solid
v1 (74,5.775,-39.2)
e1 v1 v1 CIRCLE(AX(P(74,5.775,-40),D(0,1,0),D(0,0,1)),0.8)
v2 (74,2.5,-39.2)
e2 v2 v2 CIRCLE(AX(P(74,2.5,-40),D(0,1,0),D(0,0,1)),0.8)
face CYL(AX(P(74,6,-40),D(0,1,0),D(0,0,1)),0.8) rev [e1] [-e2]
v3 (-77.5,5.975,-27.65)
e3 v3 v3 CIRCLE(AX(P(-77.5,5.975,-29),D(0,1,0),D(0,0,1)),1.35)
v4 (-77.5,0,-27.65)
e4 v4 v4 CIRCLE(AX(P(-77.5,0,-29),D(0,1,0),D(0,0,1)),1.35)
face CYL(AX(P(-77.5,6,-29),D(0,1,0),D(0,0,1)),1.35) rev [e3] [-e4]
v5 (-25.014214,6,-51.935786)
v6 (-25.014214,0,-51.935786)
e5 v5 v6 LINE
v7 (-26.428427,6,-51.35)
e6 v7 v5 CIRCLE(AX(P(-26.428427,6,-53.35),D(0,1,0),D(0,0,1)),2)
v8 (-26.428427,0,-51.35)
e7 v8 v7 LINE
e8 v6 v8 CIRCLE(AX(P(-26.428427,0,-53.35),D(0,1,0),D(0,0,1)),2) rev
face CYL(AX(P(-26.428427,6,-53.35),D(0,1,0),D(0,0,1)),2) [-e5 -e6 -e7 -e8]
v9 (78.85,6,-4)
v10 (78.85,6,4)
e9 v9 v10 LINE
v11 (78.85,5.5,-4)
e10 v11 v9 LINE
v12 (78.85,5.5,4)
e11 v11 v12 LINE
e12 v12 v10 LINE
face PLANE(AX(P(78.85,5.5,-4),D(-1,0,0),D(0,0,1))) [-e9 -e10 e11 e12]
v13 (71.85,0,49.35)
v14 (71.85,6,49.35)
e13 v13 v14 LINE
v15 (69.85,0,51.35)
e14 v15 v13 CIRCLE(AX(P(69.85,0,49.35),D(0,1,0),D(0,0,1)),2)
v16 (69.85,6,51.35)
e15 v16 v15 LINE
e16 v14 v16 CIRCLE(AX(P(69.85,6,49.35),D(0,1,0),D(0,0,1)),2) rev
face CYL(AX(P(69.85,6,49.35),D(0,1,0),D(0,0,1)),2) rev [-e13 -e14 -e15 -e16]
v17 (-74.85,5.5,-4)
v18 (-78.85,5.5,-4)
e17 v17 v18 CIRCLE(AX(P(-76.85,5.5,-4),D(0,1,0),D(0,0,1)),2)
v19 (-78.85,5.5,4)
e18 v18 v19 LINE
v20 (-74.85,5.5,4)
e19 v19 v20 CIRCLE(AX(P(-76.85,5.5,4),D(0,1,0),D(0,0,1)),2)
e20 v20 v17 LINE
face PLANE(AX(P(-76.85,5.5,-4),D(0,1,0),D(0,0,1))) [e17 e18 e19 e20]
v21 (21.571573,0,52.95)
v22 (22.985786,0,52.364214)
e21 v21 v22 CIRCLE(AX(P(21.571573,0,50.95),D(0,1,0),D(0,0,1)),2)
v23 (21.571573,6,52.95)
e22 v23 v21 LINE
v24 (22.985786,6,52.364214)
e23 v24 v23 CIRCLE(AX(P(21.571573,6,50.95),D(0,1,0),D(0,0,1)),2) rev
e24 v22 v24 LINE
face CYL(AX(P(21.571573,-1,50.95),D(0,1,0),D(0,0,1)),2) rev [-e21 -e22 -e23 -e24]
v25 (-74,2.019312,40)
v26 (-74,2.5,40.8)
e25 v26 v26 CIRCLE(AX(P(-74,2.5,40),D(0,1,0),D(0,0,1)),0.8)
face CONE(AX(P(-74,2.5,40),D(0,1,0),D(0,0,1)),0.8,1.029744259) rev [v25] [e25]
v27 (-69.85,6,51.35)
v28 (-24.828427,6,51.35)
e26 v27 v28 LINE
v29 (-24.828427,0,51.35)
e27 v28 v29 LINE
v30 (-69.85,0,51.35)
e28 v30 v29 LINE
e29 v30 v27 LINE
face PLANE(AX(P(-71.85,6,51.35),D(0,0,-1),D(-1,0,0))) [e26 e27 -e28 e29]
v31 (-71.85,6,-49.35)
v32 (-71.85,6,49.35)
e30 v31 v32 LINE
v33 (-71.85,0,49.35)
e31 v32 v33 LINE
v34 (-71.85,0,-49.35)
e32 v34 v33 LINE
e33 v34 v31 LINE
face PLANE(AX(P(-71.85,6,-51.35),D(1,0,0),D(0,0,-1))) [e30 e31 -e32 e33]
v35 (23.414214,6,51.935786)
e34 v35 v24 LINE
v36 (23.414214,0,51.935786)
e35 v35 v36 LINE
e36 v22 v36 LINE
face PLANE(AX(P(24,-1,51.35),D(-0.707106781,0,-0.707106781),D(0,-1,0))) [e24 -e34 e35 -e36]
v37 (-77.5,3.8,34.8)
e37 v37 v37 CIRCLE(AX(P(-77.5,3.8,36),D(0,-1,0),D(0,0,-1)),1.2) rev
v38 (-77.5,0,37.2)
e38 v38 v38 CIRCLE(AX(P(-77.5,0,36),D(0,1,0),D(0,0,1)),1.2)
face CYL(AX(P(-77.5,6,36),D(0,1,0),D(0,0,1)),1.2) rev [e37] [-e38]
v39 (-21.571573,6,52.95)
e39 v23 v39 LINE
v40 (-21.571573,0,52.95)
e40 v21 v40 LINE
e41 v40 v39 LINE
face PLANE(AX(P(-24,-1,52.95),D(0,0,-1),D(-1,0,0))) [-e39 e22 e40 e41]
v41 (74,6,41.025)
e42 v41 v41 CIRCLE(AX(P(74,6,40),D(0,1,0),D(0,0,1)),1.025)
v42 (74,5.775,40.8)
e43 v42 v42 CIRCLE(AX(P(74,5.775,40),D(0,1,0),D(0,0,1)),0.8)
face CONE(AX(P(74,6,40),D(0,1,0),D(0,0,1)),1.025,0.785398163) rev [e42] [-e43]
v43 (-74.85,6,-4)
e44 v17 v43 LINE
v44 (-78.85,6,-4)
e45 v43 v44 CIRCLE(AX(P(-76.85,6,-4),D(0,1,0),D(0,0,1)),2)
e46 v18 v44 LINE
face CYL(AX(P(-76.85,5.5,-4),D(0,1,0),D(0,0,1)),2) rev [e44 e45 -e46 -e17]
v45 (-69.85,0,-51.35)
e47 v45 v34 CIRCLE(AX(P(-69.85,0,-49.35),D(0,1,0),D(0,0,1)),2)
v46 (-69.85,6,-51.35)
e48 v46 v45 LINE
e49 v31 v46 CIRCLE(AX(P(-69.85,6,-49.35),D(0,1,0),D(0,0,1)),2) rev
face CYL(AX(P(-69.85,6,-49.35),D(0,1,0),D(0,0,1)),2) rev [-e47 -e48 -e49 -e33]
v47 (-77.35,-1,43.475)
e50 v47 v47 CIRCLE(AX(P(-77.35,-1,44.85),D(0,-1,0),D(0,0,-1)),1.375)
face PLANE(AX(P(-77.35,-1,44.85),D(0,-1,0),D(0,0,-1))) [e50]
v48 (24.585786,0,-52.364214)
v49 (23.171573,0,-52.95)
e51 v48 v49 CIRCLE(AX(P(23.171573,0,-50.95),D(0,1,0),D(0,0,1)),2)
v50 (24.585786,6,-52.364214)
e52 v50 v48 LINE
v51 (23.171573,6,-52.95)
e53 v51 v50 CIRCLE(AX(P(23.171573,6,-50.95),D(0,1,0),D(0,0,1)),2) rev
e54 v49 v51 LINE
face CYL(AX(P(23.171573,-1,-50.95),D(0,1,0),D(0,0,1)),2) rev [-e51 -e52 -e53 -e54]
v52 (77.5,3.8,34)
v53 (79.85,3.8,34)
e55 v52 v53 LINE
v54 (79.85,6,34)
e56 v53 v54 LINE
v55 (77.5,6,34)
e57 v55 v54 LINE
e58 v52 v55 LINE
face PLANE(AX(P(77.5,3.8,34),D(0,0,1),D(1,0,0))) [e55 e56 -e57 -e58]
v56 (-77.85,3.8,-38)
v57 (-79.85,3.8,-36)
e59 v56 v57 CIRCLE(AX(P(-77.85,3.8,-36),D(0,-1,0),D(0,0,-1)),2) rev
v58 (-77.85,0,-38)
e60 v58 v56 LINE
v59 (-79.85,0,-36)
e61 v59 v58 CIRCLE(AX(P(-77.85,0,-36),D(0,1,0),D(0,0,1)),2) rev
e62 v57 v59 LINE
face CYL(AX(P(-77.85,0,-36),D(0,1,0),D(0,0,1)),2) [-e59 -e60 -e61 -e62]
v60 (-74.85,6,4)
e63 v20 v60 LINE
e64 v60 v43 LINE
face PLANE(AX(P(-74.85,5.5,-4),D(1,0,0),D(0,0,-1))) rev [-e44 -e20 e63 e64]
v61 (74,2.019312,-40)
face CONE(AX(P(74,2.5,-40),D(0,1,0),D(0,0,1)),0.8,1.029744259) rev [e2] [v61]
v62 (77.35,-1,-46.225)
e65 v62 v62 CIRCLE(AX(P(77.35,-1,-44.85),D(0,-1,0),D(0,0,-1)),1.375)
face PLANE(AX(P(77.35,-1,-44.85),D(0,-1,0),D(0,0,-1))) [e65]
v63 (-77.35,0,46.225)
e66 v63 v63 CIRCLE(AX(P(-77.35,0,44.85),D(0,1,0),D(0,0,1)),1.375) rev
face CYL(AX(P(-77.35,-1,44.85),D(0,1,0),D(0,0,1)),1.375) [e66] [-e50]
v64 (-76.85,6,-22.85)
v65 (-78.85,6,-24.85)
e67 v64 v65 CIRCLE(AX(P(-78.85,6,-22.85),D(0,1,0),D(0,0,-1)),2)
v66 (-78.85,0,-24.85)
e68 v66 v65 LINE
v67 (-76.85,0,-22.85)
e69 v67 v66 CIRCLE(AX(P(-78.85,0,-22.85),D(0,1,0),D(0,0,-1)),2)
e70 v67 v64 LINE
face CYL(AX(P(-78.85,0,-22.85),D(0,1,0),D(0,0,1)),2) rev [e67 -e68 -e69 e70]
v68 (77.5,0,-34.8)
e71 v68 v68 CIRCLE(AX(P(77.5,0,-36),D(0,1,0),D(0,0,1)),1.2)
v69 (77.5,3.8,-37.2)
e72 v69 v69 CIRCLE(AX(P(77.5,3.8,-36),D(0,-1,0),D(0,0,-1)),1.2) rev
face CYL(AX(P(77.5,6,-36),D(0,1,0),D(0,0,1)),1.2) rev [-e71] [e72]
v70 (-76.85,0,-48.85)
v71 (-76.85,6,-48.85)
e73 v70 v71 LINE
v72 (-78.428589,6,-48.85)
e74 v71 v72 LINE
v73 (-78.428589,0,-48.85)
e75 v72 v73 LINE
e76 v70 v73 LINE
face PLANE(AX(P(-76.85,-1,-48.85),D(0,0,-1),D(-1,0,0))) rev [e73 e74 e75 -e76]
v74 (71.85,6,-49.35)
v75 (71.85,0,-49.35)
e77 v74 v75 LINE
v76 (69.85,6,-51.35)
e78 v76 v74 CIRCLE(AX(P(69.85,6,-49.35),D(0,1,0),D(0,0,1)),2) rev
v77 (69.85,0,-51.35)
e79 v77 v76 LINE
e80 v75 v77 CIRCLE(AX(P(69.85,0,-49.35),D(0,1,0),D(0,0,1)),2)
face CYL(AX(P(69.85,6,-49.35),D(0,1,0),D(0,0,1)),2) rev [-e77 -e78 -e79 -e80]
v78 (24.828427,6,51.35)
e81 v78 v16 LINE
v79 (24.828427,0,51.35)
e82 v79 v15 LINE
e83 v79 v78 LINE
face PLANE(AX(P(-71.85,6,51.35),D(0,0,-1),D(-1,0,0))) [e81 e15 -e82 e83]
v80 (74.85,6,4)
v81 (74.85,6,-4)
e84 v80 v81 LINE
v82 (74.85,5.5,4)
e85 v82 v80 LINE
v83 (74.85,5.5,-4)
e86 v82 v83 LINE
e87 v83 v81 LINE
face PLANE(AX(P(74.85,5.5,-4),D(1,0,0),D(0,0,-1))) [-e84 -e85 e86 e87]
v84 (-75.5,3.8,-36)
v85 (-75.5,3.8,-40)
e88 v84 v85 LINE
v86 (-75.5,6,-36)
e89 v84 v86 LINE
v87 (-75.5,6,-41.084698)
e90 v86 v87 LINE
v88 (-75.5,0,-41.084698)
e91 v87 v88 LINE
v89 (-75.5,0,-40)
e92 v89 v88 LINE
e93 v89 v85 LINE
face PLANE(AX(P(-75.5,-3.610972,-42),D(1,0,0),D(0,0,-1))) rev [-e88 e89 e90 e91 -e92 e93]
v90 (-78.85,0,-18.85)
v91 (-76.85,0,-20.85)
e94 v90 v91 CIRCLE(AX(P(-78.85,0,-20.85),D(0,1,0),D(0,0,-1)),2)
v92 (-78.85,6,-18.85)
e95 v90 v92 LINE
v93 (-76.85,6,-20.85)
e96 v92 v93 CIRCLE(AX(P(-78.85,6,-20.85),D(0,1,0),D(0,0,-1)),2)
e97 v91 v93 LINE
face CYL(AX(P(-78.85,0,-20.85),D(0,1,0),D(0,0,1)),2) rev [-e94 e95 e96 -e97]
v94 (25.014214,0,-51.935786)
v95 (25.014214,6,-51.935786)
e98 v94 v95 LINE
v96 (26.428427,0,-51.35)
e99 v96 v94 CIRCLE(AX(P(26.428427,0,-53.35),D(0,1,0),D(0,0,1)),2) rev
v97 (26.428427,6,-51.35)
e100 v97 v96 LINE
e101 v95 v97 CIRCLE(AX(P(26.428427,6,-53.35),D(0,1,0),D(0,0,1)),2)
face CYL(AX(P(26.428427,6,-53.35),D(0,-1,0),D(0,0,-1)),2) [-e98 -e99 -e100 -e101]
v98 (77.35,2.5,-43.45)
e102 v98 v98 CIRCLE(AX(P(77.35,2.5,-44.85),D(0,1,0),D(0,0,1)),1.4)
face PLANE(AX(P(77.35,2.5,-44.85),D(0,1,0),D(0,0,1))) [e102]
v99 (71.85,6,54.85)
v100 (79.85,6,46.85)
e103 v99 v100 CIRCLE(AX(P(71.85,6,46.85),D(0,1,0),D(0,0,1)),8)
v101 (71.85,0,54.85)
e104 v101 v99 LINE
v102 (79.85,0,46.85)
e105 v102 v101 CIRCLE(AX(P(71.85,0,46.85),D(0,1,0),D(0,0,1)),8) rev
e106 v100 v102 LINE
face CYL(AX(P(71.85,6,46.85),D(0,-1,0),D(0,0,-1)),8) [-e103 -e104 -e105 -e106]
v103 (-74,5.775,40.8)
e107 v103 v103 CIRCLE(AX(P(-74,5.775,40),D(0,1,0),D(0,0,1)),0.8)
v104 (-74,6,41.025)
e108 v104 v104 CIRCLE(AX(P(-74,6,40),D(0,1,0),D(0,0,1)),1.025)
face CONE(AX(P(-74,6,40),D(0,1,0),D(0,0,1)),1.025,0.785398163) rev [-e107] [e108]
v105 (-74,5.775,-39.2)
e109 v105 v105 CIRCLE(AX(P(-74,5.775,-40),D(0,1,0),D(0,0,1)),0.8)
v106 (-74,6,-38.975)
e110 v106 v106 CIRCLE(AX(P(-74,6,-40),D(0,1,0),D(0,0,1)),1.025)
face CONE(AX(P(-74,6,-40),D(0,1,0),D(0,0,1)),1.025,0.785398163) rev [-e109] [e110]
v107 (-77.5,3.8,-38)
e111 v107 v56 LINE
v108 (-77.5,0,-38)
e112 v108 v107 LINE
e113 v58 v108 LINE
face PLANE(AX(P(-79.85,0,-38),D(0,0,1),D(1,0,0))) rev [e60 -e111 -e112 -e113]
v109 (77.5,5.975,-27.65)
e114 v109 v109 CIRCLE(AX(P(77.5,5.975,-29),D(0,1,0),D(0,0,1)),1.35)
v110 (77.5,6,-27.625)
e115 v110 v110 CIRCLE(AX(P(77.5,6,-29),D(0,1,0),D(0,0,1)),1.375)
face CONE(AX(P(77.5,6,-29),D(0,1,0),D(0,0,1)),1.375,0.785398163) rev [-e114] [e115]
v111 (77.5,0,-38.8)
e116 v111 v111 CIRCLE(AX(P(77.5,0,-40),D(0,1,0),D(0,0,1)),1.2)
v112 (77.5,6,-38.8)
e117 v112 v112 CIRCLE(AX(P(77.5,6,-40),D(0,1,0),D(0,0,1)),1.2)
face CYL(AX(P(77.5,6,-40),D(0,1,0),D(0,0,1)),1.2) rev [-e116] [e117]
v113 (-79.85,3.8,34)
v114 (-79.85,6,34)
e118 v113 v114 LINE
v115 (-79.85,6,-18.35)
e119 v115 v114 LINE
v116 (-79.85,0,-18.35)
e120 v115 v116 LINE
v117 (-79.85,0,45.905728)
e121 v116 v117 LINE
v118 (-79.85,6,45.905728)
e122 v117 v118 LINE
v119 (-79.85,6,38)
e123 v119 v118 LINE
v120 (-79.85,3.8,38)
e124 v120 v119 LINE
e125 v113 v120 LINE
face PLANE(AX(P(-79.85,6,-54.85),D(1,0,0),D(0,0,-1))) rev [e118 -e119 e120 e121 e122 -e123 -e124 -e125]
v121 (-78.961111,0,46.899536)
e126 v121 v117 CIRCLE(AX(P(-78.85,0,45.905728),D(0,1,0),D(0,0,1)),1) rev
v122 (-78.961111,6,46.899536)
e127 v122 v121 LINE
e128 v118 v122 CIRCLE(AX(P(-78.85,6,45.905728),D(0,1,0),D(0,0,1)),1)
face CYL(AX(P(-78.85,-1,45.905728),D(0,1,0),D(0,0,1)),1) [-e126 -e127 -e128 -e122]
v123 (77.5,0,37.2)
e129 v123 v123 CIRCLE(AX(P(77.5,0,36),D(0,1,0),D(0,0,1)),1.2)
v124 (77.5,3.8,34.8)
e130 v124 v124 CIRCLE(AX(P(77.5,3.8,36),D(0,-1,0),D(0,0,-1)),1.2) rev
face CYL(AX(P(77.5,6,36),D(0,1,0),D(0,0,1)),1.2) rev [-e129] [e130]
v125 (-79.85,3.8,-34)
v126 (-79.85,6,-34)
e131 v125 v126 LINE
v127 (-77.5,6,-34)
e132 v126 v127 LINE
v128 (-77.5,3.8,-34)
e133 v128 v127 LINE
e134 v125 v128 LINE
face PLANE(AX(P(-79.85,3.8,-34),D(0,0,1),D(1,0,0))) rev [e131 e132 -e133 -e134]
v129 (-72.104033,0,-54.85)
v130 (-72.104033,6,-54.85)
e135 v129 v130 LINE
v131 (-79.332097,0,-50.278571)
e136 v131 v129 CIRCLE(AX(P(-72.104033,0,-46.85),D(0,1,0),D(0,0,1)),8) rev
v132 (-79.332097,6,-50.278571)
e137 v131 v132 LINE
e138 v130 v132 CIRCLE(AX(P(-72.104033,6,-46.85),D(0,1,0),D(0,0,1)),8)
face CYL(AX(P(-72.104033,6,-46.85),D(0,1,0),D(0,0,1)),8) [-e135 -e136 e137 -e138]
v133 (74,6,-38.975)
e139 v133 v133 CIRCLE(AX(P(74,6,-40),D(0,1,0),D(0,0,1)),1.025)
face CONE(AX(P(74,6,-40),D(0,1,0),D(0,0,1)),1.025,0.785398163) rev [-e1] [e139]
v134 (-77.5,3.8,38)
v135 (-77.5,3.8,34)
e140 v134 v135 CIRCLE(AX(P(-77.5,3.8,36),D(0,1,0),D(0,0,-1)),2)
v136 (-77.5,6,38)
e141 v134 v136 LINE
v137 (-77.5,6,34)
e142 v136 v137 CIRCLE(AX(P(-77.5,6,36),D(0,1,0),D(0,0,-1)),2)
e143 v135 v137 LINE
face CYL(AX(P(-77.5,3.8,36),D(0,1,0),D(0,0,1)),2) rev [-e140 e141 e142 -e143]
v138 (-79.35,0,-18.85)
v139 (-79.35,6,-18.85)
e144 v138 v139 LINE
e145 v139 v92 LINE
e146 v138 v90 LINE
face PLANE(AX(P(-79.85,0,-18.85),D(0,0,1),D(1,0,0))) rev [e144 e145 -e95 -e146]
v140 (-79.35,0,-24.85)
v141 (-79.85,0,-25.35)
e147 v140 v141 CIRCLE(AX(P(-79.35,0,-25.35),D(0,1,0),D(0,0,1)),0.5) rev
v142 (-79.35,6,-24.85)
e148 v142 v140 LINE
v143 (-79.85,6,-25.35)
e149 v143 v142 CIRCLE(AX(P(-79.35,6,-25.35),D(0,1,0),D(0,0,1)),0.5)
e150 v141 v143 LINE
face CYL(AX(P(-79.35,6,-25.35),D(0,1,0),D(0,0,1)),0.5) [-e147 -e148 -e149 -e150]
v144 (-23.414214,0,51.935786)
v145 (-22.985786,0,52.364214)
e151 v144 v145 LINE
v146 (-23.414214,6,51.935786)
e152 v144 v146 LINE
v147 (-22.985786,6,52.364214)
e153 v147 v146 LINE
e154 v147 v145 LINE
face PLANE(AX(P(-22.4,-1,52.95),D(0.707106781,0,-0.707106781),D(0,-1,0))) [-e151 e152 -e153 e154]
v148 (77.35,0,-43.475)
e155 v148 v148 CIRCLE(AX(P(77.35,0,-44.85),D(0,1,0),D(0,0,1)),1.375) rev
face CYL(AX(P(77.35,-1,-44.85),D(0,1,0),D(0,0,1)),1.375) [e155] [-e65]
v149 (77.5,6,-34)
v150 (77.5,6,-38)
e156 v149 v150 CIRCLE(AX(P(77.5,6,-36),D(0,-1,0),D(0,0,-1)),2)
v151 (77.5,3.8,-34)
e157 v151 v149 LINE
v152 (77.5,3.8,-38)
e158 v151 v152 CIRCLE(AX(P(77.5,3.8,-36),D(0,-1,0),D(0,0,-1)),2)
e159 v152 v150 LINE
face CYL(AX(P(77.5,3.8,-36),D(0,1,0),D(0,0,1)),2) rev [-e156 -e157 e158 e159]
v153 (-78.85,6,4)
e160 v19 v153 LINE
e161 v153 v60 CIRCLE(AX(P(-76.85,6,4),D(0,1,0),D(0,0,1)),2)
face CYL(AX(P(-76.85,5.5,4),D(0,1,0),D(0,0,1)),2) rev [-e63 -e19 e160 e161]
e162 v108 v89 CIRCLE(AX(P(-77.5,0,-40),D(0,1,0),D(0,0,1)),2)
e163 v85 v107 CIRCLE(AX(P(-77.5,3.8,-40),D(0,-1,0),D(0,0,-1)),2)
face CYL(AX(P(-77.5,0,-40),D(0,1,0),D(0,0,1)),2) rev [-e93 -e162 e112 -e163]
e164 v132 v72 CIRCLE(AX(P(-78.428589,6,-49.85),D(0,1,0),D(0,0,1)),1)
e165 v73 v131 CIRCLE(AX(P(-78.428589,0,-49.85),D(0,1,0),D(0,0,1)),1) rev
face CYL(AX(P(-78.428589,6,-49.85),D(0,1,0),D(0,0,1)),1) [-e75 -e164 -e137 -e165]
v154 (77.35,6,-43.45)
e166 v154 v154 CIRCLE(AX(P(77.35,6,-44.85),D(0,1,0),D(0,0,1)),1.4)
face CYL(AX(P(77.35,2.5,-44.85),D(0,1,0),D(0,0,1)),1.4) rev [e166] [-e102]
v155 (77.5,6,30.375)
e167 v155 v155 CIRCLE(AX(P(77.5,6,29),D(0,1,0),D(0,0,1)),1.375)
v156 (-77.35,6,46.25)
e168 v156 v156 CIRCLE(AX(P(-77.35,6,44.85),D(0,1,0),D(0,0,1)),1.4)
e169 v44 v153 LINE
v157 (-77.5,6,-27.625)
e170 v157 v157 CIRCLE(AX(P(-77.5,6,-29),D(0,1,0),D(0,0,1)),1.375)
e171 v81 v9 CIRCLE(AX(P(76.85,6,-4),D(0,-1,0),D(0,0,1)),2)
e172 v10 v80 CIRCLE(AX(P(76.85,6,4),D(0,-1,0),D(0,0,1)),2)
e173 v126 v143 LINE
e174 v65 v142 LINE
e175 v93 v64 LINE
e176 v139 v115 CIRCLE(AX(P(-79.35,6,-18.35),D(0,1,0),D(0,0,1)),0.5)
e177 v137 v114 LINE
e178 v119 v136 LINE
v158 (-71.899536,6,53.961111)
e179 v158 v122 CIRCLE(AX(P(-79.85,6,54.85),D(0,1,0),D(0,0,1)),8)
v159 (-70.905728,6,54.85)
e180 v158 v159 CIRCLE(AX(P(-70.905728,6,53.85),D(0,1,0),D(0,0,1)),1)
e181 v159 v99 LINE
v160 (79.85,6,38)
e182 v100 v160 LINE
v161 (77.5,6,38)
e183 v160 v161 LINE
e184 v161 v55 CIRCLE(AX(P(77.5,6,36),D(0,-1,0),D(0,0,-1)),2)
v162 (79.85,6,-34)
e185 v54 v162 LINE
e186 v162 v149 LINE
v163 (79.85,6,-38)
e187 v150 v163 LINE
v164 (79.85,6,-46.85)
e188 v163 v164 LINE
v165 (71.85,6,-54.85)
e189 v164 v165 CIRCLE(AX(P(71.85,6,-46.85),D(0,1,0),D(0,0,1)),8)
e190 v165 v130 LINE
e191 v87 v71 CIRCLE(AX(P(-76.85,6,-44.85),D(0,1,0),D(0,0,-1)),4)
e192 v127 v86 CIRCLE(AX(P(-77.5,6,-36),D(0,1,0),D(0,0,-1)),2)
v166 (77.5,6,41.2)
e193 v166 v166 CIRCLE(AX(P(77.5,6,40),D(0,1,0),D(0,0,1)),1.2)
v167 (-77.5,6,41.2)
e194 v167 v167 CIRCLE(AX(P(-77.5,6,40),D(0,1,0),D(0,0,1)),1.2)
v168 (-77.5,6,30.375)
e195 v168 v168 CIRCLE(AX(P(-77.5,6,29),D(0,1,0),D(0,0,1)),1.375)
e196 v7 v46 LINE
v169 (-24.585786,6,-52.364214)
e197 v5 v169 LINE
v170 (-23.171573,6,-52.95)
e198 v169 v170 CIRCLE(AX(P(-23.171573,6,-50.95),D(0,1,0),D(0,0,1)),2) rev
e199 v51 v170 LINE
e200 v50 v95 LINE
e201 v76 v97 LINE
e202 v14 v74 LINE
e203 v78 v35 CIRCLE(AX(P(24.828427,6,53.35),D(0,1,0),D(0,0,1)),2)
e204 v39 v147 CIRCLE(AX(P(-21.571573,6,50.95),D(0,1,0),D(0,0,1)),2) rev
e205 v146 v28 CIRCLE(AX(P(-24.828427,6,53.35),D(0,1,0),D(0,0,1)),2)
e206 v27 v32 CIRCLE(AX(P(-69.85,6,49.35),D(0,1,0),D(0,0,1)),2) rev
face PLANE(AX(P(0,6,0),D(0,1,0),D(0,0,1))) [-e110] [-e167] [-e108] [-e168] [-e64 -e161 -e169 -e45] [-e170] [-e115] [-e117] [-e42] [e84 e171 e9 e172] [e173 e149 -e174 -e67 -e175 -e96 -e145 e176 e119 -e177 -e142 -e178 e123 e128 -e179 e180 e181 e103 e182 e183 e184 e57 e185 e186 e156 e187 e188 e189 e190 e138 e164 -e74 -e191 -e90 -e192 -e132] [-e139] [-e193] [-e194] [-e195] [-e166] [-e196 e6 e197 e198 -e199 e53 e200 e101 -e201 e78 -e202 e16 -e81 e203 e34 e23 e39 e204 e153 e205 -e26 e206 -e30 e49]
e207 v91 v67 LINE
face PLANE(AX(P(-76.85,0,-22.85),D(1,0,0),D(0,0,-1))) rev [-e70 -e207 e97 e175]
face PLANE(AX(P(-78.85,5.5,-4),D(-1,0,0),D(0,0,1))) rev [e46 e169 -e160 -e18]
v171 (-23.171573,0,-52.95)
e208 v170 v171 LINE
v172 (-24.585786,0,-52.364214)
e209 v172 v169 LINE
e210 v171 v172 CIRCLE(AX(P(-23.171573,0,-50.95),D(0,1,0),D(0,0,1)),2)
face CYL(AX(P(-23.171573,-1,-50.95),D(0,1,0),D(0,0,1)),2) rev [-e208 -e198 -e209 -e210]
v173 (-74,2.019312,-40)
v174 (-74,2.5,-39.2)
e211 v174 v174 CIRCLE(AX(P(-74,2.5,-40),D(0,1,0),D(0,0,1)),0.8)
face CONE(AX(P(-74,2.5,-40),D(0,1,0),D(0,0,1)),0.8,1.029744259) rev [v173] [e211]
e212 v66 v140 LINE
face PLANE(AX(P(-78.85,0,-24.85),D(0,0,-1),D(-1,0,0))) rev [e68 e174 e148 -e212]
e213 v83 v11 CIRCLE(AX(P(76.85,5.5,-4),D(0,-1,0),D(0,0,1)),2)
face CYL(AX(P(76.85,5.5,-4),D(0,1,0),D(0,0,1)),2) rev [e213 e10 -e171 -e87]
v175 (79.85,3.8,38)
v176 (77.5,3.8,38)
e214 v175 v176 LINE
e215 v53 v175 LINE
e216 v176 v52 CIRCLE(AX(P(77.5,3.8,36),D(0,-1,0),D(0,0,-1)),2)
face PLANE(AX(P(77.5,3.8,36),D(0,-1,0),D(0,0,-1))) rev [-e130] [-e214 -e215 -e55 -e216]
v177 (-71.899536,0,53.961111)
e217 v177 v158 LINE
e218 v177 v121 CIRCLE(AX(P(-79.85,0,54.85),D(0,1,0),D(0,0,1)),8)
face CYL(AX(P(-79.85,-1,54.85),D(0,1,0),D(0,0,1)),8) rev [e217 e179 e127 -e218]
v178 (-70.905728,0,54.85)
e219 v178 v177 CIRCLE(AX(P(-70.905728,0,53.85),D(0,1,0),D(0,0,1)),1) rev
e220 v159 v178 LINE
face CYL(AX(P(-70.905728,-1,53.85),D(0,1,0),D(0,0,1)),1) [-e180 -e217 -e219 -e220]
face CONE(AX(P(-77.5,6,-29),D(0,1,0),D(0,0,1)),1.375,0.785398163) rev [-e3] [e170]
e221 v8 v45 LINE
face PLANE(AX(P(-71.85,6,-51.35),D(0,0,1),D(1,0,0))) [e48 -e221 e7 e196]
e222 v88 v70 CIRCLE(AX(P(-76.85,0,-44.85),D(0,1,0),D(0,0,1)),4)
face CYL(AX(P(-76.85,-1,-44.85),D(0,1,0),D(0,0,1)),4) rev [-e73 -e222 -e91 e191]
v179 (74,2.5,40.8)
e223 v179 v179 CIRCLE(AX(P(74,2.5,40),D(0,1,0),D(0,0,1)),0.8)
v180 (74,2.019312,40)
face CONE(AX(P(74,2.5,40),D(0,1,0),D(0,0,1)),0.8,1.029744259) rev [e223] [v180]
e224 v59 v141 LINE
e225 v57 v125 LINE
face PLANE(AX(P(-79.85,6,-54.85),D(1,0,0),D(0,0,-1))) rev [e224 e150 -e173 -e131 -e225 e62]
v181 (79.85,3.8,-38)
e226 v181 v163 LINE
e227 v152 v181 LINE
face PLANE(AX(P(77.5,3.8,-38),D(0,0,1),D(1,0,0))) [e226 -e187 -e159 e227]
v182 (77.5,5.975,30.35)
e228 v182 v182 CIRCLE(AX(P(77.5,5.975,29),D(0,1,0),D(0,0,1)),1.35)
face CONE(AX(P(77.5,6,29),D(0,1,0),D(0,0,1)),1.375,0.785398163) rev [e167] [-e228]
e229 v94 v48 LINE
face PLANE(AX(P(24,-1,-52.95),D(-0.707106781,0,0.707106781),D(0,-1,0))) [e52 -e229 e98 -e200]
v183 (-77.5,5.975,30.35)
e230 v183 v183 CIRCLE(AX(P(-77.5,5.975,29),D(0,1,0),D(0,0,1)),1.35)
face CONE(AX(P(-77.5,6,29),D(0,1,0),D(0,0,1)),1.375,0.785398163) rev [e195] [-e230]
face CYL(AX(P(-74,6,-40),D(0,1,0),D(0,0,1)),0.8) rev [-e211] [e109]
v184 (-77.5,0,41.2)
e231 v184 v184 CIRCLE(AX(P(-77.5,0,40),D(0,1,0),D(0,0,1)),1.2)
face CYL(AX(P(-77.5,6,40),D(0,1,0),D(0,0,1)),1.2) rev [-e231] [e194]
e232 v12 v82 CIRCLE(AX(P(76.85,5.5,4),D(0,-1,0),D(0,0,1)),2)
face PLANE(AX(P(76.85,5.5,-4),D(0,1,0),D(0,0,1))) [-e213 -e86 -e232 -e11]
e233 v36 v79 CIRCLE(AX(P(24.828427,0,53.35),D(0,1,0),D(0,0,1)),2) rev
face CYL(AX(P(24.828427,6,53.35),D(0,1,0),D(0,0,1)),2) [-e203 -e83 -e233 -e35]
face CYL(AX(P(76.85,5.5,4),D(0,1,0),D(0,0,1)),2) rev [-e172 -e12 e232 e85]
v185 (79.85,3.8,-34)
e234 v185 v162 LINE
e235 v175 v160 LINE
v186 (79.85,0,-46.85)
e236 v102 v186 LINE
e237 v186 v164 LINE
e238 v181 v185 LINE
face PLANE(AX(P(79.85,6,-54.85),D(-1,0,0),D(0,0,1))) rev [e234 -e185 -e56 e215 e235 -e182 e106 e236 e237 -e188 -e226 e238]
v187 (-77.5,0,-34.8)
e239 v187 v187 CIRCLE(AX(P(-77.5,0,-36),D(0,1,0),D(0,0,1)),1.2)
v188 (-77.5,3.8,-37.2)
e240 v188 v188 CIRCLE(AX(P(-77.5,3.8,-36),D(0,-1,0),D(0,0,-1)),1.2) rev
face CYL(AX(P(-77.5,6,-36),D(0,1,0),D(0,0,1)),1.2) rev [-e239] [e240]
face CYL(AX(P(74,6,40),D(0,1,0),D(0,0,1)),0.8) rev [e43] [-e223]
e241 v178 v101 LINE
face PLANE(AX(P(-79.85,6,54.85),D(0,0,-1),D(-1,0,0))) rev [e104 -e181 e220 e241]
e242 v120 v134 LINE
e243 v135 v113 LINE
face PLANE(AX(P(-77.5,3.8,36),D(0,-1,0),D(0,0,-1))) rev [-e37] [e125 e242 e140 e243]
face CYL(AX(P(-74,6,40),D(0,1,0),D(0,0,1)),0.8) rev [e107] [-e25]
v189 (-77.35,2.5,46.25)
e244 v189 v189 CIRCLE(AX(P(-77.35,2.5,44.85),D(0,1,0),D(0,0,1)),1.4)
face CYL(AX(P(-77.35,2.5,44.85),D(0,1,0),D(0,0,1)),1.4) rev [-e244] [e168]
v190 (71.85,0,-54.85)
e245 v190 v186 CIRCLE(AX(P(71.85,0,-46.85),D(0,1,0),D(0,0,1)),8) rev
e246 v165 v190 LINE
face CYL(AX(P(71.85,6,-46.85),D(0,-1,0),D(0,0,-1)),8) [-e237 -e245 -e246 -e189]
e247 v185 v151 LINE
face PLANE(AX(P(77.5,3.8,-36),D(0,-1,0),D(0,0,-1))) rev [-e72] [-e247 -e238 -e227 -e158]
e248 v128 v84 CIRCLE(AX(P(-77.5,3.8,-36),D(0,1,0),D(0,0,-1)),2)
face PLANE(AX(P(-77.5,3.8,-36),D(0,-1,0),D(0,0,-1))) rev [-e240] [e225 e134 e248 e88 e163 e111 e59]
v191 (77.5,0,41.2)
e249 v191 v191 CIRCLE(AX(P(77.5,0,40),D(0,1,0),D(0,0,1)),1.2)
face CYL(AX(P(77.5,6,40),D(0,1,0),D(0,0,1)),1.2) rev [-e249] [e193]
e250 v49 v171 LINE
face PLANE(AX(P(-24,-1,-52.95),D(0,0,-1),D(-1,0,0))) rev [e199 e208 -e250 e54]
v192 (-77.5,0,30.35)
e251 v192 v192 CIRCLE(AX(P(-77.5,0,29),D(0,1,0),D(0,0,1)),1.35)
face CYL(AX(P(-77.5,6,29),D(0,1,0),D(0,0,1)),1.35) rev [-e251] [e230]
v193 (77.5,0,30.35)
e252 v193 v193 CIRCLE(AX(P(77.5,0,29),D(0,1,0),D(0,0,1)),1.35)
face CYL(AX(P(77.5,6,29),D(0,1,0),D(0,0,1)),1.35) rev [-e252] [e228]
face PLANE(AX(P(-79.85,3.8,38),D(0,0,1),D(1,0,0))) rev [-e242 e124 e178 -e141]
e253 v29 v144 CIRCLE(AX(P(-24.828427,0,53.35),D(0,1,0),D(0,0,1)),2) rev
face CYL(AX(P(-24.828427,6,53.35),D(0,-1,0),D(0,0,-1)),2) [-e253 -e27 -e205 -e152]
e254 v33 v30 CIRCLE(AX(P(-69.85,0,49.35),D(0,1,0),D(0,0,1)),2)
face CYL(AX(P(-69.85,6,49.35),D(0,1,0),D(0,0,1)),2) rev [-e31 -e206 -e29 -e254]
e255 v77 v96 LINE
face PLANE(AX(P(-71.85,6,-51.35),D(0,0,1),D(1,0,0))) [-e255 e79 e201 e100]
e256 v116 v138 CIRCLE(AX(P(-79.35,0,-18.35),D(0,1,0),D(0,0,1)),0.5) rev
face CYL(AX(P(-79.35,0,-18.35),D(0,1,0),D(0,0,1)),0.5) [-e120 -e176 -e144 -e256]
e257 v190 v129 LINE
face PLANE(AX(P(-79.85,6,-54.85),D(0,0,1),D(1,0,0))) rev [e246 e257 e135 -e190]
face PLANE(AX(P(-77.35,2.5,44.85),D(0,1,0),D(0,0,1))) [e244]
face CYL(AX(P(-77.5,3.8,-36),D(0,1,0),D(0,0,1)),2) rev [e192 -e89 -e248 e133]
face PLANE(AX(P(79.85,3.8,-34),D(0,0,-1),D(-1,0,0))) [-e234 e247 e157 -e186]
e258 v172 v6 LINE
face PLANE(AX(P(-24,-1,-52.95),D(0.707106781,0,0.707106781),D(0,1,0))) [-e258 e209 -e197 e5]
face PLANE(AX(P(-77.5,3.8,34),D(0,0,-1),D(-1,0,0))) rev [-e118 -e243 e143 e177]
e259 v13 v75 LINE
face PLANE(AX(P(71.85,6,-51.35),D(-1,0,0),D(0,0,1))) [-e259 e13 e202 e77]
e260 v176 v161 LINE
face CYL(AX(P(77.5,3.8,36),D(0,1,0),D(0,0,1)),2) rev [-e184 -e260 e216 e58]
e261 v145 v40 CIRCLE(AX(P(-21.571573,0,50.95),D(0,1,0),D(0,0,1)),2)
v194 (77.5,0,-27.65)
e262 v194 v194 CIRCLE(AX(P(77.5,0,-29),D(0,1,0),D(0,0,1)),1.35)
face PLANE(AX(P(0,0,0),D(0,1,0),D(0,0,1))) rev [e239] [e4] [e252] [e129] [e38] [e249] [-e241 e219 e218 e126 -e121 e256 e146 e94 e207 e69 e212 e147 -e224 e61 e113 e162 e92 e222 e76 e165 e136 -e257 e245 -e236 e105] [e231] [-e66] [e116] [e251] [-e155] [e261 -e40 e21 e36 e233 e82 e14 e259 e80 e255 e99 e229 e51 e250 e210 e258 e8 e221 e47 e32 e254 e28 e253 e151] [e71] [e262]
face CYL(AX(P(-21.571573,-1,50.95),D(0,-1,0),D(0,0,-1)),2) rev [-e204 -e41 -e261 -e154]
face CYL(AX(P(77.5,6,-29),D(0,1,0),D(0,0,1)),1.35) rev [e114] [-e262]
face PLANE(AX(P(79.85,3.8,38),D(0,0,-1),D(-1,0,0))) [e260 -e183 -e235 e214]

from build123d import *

# Parameters (mm, degrees)
SKETCH1_W                            = 159.7
SKETCH1_H                            = 109.7
SKETCH1_W_2                          = 143.7
SKETCH1_H_2                          = 102.7
BOSS_EXTRUDE1_DEPTH                  = 6
F_2_4_2_4_DIAMETER_HOLE1_D           = 2.4
CUT_EXTRUDE10_DEPTH                  = 2.2
LPATTERN1_COUNT                      = 2
LPATTERN1_PITCH                      = 72
MIRROR2_COPY_1_DEPTH                 = 2.2
M2X0_4_TAPPED_HOLE1_D                = 1.6
M2X0_4_TAPPED_HOLE1_DEPTH            = 3.5
M2X0_4_TAPPED_HOLE1_CSINK_D          = 2.05
M2X0_4_TAPPED_HOLE1_CSINK_ANGLE      = 90
M2X0_4_TAPPED_HOLE1_TIP              = 0.480688495
CUT_EXTRUDE3_DEPTH                   = 0.5
SKETCH11_W                           = 4.35
SKETCH11_H                           = 6
CUT_EXTRUDE4_DEPTH                   = 2.2
CUT_EXTRUDE11_DEPTH                  = 97.948362544
CUT_EXTRUDE11_DEPTH_BACK             = 97.948362544
F_2_4_2_4_DIAMETER_HOLE2_D           = 2.4
F_2_7_2_7_DIAMETER_HOLE1_D           = 2.7
F_2_7_2_7_DIAMETER_HOLE1_CSINK_D     = 2.75
F_2_7_2_7_DIAMETER_HOLE1_CSINK_ANGLE = 90
CUT_EXTRUDE6_DEPTH                   = 98.059492065
SKETCH19_R                           = 1.4
CUT_EXTRUDE7_DEPTH                   = 3.5
SKETCH32_R                           = 1.375
BOSS_EXTRUDE2_DEPTH                  = 1
CUT_EXTRUDE8_DEPTH                   = 98.126438213
SKETCH8_R                            = 8
CUT_EXTRUDE9_DEPTH                   = 98.126438213
FILLET1_R                            = 2
FILLET2_R                            = 8
FILLET3_R                            = 1
FILLET4_R                            = 2
FILLET5_R                            = 0.5
SKETCH31_W                           = 48
SKETCH31_H                           = 1.6
CUT_EXTRUDE12_DEPTH                  = 98.126438213
CHAMFER1_START                       = -1
CHAMFER1_DEPTH                       = 8
CHAMFER1_2_DEPTH                     = 6
FILLET6_R                            = 2


with BuildPart() as part:
    # Sketch1 → Boss-Extrude1 (new body)
    with BuildSketch(Plane(origin=(0, 0, 0), x_dir=(1, 0, 0), z_dir=(0, 1, 0))):
        Rectangle(SKETCH1_W, SKETCH1_H)
        Rectangle(SKETCH1_W_2, SKETCH1_H_2, mode=Mode.SUBTRACT)
    extrude(amount=BOSS_EXTRUDE1_DEPTH)

    # Ø2.4 (2.4) Diameter Hole1 (through all)
    with Locations(Plane(origin=(0, 6, 0), x_dir=(1, 0, 0), z_dir=(0, 1, 0))):
        with Locations((-77.5, 36), (77.5, 36), (-77.5, -36), (77.5, -36)):
            Hole(F_2_4_2_4_DIAMETER_HOLE1_D / 2)

    # Sketch29 → Cut-Extrude10 (cut)
    with BuildSketch(Plane(origin=(0, 6, 0), x_dir=(1, 0, 0), z_dir=(0, 1, 0))):
        with BuildLine():
            Line((-77.5, 38), (-79.85, 38))
            Line((-79.85, 38), (-79.85, 34))
            Line((-79.85, 34), (-77.5, 34))
            ThreePointArc((-77.5, 34), (-75.5, 36), (-77.5, 38))
        make_face()
    cut_extrude10 = extrude(amount=-CUT_EXTRUDE10_DEPTH, mode=Mode.SUBTRACT)

    # LPattern1: Cut-Extrude10 ×2
    with Locations(*[(0, 0, i * LPATTERN1_PITCH) for i in range(1, LPATTERN1_COUNT)]):
        add(cut_extrude10, mode=Mode.SUBTRACT)

    # Mirror2: Cut-Extrude10 across plane
    add(cut_extrude10.mirror(Plane(origin=(0, 0, 0), x_dir=(0, 0, 1), z_dir=(1, 0, 0))), mode=Mode.SUBTRACT)

    # Mirror2 copy 1 sketch → Mirror2 copy 1 (cut)
    with BuildSketch(Plane(origin=(0, 6, 72), x_dir=(-1, 0, 0), z_dir=(0, 1, 0))):
        with BuildLine():
            Line((-77.5, -38), (-79.85, -38))
            Line((-79.85, -38), (-79.85, -34))
            Line((-79.85, -34), (-77.5, -34))
            ThreePointArc((-77.5, -34), (-75.5, -36), (-77.5, -38))
        make_face()
    extrude(amount=-MIRROR2_COPY_1_DEPTH, mode=Mode.SUBTRACT)

    # M2x0.4 Tapped Hole1
    with Locations(Plane(origin=(0, 6, 0), x_dir=(1, 0, 0), z_dir=(0, 1, 0))):
        with Locations((-74, 40), (-74, -40), (74, 40), (74, -40)):
            CounterSinkHole(M2X0_4_TAPPED_HOLE1_D / 2, M2X0_4_TAPPED_HOLE1_CSINK_D / 2, depth=M2X0_4_TAPPED_HOLE1_DEPTH, counter_sink_angle=M2X0_4_TAPPED_HOLE1_CSINK_ANGLE)
            with Locations((0, 0, -(M2X0_4_TAPPED_HOLE1_DEPTH + M2X0_4_TAPPED_HOLE1_TIP / 2))):  # 118° drill point
                Cone(0, M2X0_4_TAPPED_HOLE1_D / 2, M2X0_4_TAPPED_HOLE1_TIP, mode=Mode.SUBTRACT)

    # Sketch9 → Cut-Extrude3 (cut)
    with BuildSketch(Plane(origin=(0, 6, 0), x_dir=(1, 0, 0), z_dir=(0, 1, 0))):
        with BuildLine():
            Line((-74.85, 4), (-74.85, -4))
            ThreePointArc((-74.85, -4), (-76.85, -6), (-78.85, -4))
            Line((-78.85, -4), (-78.85, 4))
            ThreePointArc((-78.85, 4), (-76.85, 6), (-74.85, 4))
        make_face()
    cut_extrude3 = extrude(amount=-CUT_EXTRUDE3_DEPTH, mode=Mode.SUBTRACT)

    # Mirror1: Cut-Extrude3 across plane
    add(cut_extrude3.mirror(Plane(origin=(0, 0, 0), x_dir=(0, 0, 1), z_dir=(1, 0, 0))), mode=Mode.SUBTRACT)

    # Sketch11 → Cut-Extrude4 (cut)
    with BuildSketch(Plane(origin=(0, 6, 0), x_dir=(1, 0, 0), z_dir=(0, 1, 0))):
        with Locations((-77.675, 39)):
            Rectangle(SKETCH11_W, SKETCH11_H)
    extrude(amount=-CUT_EXTRUDE4_DEPTH, mode=Mode.SUBTRACT)

    # Sketch30 → Cut-Extrude11 (cut, two sides: drawn at the far end of the back side and taken through both)
    with BuildSketch(Plane(origin=(0, 3.8, 0), x_dir=(1, 0, 0), z_dir=(0, 1, 0)).offset(-CUT_EXTRUDE11_DEPTH_BACK)):
        with BuildLine():
            Line((-75.5, 40), (-75.5, 42))
            Line((-75.5, 42), (-79.85, 42))
            Line((-79.85, 42), (-79.85, 38))
            Line((-79.85, 38), (-77.5, 38))
            ThreePointArc((-77.5, 38), (-76.085786438, 38.585786438), (-75.5, 40))
        make_face()
    extrude(amount=CUT_EXTRUDE11_DEPTH + CUT_EXTRUDE11_DEPTH_BACK, mode=Mode.SUBTRACT)

    # Ø2.4 (2.4) Diameter Hole2 (through all)
    with Locations(Plane(origin=(0, 6, 0), x_dir=(1, 0, 0), z_dir=(0, 1, 0))):
        with Locations((-77.5, -40), (77.5, 40), (77.5, -40)):
            Hole(F_2_4_2_4_DIAMETER_HOLE2_D / 2)

    # Ø2.7 (2.7) Diameter Hole1 (through all)
    with Locations(Plane(origin=(0, 6, 0), x_dir=(1, 0, 0), z_dir=(0, 1, 0))):
        with Locations((-77.5, 29), (-77.5, -29), (77.5, 29), (77.5, -29)):
            CounterSinkHole(F_2_7_2_7_DIAMETER_HOLE1_D / 2, F_2_7_2_7_DIAMETER_HOLE1_CSINK_D / 2, counter_sink_angle=F_2_7_2_7_DIAMETER_HOLE1_CSINK_ANGLE)

    # Sketch18 → Cut-Extrude6 (cut, through all)
    with BuildSketch(Plane(origin=(0, 6, 0), x_dir=(1, 0, 0), z_dir=(0, 1, 0))):
        with BuildLine():
            Line((-78.85, 24.85), (-79.85, 24.85))
            Line((-79.85, 24.85), (-79.85, 18.85))
            Line((-79.85, 18.85), (-78.85, 18.85))
            ThreePointArc((-78.85, 18.85), (-77.435786438, 19.435786438), (-76.85, 20.85))
            Line((-76.85, 20.85), (-76.85, 22.85))
            ThreePointArc((-76.85, 22.85), (-77.435786438, 24.264213562), (-78.85, 24.85))
        make_face()
    extrude(amount=-CUT_EXTRUDE6_DEPTH, mode=Mode.SUBTRACT)

    # Sketch19 → Cut-Extrude7 (cut)
    with BuildSketch(Plane(origin=(0, 6, 0), x_dir=(1, 0, 0), z_dir=(0, 1, 0))):
        with Locations(Location((77.35, 44.85, 0), (0, 0, 270))):
            Circle(SKETCH19_R)
        with Locations(Location((-77.35, -44.85, 0), (0, 0, 270))):
            Circle(SKETCH19_R)
    extrude(amount=-CUT_EXTRUDE7_DEPTH, mode=Mode.SUBTRACT)

    # Sketch32 → Boss-Extrude2 (add)
    with BuildSketch(Plane.XZ):
        with Locations(Location((-77.35, 44.85, 0), (0, 0, 90))):
            Circle(SKETCH32_R)
        with Locations(Location((77.35, -44.85, 0), (0, 0, 90))):
            Circle(SKETCH32_R)
    extrude(amount=BOSS_EXTRUDE2_DEPTH)

    # Sketch7 → Cut-Extrude8 (cut, through all)
    with BuildSketch(Plane(origin=(0, 6, 0), x_dir=(1, 0, 0), z_dir=(0, 1, 0))):
        with BuildLine():
            Line((-76.85, 48.85), (-79.85, 48.85))
            Line((-79.85, 48.85), (-79.85, 40.85))
            Line((-79.85, 40.85), (-76.85, 40.85))
            ThreePointArc((-76.85, 40.85), (-72.85, 44.85), (-76.85, 48.85))
        make_face()
    extrude(amount=-CUT_EXTRUDE8_DEPTH, mode=Mode.SUBTRACT)

    # Sketch8 → Cut-Extrude9 (cut, through all)
    with BuildSketch(Plane(origin=(0, 6, 0), x_dir=(1, 0, 0), z_dir=(0, 1, 0))):
        with Locations((-79.85, -54.85)):
            Circle(SKETCH8_R)
    extrude(amount=-CUT_EXTRUDE9_DEPTH, mode=Mode.SUBTRACT)

    # Fillet1
    fillet1_edges = [part.edges().sort_by_distance(p)[0] for p in [
        (71.85, 3, 51.35),
        (71.85, 3, -51.35),
        (-71.85, 3, -51.35),
        (-71.85, 3, 51.35),
    ]]
    fillet(fillet1_edges, radius=FILLET1_R)

    # Fillet2
    # the kernel refuses this fillet: 8 mm, written as the material it takes off along each edge
    with BuildSketch(Plane(origin=(79.85, -20, 54.85), x_dir=(-1, 0, 0), z_dir=(0, 1, 0)), Plane(origin=(79.85, -20, -54.85), x_dir=(0, 0, 1), z_dir=(0, 1, 0))) as fillet2_piece_1:
        with BuildLine():
            CenterArc((FILLET2_R, -FILLET2_R), FILLET2_R, 90, 90)
            Line((0, -FILLET2_R), (-FILLET2_R * 0.02, -FILLET2_R))
            Line((-FILLET2_R * 0.02, -FILLET2_R), (-FILLET2_R * 0.02, FILLET2_R * 0.02))
            Line((-FILLET2_R * 0.02, FILLET2_R * 0.02), (FILLET2_R, FILLET2_R * 0.02))
            Line((FILLET2_R, FILLET2_R * 0.02), (FILLET2_R, 0))
        make_face()
    extrude(amount=46, mode=Mode.SUBTRACT)
    with BuildSketch(Plane(origin=(-79.85, -19.364916731, -54.85), x_dir=(1, 0, 0), z_dir=(0, 1, 0))) as fillet2_piece_2:
        with BuildLine():
            CenterArc((7.745966692, -8), FILLET2_R, 90, 75.522487814)
            Line((0, -6), (-0.154919334, -5.96))
            ThreePointArc((-0.154919334, -5.96), (-0.16, -3), (-0.16, 0))
            Line((-0.16, 0), (0, 0.16))
            Line((0, 0.16), (7.745966692, 0.16))
            Line((7.745966692, 0.16), (7.745966692, 0))
        make_face()
    extrude(amount=44.729833462, mode=Mode.SUBTRACT)

    # Fillet3
    fillet3_edges = [part.edges().sort_by_distance(p)[0] for p in [
        (-79.85, 3, -48.85),
        (-71.85, 3, 54.85),
        (-79.85, 3, 46.85),
    ]]
    fillet(fillet3_edges, radius=FILLET3_R)

    # Fillet4
    fillet4_edges = [part.edges().sort_by_distance(p)[0] for p in [
        (-79.85, 1.9, -38),
    ]]
    fillet(fillet4_edges, radius=FILLET4_R)

    # Fillet5
    fillet5_edges = [part.edges().sort_by_distance(p)[0] for p in [
        (-79.85, 3, -18.85),
        (-79.85, 3, -24.85),
    ]]
    fillet(fillet5_edges, radius=FILLET5_R)

    # Sketch31 → Cut-Extrude12 (cut, through all)
    with BuildSketch(Plane(origin=(0, 6, 0), x_dir=(1, 0, 0), z_dir=(0, 1, 0))):
        with Locations((0, 52.15)):
            Rectangle(SKETCH31_W, SKETCH31_H)
    cut_extrude12 = extrude(amount=-CUT_EXTRUDE12_DEPTH, mode=Mode.SUBTRACT)

    # Mirror3: Cut-Extrude12 across plane
    add(cut_extrude12.mirror(Plane.XY), mode=Mode.SUBTRACT)

    # Chamfer1: read off the stored shape, not the designer's step
    # Chamfer1 outline → Chamfer1 (cut)
    with BuildSketch(Plane(origin=(0, 0, 0), x_dir=(1, 0, 0), z_dir=(0, 1, 0)).offset(CHAMFER1_START)):
        Polygon((25.6, 51.35), (24, 52.95), (24, 51.35), align=None)
        Polygon((-24, 52.95), (-25.6, 51.35), (-24, 51.35), align=None)
    extrude(amount=CHAMFER1_DEPTH, mode=Mode.SUBTRACT)

    # Chamfer1 2 outline → Chamfer1 2 (add)
    with BuildSketch(Plane(origin=(0, 0, 0), x_dir=(1, 0, 0), z_dir=(0, 1, 0))):
        Polygon((24, -52.95), (24, -51.35), (22.4, -52.95), align=None)
        Polygon((-24, -52.95), (-22.4, -52.95), (-24, -51.35), align=None)
    extrude(amount=CHAMFER1_2_DEPTH)

    # Fillet6
    fillet6_edges = [part.edges().sort_by_distance(p)[0] for p in [
        (-24, 3, -52.95),
        (24, 3, -52.95),
        (24, 3, 51.35),
        (-24, 3, 51.35),
        (-22.4, 3, 52.95),
        (22.4, 3, 52.95),
        (25.6, 3, -51.35),
        (-25.6, 3, -51.35),
    ]]
    fillet(fillet6_edges, radius=FILLET6_R)


solid = part.part
